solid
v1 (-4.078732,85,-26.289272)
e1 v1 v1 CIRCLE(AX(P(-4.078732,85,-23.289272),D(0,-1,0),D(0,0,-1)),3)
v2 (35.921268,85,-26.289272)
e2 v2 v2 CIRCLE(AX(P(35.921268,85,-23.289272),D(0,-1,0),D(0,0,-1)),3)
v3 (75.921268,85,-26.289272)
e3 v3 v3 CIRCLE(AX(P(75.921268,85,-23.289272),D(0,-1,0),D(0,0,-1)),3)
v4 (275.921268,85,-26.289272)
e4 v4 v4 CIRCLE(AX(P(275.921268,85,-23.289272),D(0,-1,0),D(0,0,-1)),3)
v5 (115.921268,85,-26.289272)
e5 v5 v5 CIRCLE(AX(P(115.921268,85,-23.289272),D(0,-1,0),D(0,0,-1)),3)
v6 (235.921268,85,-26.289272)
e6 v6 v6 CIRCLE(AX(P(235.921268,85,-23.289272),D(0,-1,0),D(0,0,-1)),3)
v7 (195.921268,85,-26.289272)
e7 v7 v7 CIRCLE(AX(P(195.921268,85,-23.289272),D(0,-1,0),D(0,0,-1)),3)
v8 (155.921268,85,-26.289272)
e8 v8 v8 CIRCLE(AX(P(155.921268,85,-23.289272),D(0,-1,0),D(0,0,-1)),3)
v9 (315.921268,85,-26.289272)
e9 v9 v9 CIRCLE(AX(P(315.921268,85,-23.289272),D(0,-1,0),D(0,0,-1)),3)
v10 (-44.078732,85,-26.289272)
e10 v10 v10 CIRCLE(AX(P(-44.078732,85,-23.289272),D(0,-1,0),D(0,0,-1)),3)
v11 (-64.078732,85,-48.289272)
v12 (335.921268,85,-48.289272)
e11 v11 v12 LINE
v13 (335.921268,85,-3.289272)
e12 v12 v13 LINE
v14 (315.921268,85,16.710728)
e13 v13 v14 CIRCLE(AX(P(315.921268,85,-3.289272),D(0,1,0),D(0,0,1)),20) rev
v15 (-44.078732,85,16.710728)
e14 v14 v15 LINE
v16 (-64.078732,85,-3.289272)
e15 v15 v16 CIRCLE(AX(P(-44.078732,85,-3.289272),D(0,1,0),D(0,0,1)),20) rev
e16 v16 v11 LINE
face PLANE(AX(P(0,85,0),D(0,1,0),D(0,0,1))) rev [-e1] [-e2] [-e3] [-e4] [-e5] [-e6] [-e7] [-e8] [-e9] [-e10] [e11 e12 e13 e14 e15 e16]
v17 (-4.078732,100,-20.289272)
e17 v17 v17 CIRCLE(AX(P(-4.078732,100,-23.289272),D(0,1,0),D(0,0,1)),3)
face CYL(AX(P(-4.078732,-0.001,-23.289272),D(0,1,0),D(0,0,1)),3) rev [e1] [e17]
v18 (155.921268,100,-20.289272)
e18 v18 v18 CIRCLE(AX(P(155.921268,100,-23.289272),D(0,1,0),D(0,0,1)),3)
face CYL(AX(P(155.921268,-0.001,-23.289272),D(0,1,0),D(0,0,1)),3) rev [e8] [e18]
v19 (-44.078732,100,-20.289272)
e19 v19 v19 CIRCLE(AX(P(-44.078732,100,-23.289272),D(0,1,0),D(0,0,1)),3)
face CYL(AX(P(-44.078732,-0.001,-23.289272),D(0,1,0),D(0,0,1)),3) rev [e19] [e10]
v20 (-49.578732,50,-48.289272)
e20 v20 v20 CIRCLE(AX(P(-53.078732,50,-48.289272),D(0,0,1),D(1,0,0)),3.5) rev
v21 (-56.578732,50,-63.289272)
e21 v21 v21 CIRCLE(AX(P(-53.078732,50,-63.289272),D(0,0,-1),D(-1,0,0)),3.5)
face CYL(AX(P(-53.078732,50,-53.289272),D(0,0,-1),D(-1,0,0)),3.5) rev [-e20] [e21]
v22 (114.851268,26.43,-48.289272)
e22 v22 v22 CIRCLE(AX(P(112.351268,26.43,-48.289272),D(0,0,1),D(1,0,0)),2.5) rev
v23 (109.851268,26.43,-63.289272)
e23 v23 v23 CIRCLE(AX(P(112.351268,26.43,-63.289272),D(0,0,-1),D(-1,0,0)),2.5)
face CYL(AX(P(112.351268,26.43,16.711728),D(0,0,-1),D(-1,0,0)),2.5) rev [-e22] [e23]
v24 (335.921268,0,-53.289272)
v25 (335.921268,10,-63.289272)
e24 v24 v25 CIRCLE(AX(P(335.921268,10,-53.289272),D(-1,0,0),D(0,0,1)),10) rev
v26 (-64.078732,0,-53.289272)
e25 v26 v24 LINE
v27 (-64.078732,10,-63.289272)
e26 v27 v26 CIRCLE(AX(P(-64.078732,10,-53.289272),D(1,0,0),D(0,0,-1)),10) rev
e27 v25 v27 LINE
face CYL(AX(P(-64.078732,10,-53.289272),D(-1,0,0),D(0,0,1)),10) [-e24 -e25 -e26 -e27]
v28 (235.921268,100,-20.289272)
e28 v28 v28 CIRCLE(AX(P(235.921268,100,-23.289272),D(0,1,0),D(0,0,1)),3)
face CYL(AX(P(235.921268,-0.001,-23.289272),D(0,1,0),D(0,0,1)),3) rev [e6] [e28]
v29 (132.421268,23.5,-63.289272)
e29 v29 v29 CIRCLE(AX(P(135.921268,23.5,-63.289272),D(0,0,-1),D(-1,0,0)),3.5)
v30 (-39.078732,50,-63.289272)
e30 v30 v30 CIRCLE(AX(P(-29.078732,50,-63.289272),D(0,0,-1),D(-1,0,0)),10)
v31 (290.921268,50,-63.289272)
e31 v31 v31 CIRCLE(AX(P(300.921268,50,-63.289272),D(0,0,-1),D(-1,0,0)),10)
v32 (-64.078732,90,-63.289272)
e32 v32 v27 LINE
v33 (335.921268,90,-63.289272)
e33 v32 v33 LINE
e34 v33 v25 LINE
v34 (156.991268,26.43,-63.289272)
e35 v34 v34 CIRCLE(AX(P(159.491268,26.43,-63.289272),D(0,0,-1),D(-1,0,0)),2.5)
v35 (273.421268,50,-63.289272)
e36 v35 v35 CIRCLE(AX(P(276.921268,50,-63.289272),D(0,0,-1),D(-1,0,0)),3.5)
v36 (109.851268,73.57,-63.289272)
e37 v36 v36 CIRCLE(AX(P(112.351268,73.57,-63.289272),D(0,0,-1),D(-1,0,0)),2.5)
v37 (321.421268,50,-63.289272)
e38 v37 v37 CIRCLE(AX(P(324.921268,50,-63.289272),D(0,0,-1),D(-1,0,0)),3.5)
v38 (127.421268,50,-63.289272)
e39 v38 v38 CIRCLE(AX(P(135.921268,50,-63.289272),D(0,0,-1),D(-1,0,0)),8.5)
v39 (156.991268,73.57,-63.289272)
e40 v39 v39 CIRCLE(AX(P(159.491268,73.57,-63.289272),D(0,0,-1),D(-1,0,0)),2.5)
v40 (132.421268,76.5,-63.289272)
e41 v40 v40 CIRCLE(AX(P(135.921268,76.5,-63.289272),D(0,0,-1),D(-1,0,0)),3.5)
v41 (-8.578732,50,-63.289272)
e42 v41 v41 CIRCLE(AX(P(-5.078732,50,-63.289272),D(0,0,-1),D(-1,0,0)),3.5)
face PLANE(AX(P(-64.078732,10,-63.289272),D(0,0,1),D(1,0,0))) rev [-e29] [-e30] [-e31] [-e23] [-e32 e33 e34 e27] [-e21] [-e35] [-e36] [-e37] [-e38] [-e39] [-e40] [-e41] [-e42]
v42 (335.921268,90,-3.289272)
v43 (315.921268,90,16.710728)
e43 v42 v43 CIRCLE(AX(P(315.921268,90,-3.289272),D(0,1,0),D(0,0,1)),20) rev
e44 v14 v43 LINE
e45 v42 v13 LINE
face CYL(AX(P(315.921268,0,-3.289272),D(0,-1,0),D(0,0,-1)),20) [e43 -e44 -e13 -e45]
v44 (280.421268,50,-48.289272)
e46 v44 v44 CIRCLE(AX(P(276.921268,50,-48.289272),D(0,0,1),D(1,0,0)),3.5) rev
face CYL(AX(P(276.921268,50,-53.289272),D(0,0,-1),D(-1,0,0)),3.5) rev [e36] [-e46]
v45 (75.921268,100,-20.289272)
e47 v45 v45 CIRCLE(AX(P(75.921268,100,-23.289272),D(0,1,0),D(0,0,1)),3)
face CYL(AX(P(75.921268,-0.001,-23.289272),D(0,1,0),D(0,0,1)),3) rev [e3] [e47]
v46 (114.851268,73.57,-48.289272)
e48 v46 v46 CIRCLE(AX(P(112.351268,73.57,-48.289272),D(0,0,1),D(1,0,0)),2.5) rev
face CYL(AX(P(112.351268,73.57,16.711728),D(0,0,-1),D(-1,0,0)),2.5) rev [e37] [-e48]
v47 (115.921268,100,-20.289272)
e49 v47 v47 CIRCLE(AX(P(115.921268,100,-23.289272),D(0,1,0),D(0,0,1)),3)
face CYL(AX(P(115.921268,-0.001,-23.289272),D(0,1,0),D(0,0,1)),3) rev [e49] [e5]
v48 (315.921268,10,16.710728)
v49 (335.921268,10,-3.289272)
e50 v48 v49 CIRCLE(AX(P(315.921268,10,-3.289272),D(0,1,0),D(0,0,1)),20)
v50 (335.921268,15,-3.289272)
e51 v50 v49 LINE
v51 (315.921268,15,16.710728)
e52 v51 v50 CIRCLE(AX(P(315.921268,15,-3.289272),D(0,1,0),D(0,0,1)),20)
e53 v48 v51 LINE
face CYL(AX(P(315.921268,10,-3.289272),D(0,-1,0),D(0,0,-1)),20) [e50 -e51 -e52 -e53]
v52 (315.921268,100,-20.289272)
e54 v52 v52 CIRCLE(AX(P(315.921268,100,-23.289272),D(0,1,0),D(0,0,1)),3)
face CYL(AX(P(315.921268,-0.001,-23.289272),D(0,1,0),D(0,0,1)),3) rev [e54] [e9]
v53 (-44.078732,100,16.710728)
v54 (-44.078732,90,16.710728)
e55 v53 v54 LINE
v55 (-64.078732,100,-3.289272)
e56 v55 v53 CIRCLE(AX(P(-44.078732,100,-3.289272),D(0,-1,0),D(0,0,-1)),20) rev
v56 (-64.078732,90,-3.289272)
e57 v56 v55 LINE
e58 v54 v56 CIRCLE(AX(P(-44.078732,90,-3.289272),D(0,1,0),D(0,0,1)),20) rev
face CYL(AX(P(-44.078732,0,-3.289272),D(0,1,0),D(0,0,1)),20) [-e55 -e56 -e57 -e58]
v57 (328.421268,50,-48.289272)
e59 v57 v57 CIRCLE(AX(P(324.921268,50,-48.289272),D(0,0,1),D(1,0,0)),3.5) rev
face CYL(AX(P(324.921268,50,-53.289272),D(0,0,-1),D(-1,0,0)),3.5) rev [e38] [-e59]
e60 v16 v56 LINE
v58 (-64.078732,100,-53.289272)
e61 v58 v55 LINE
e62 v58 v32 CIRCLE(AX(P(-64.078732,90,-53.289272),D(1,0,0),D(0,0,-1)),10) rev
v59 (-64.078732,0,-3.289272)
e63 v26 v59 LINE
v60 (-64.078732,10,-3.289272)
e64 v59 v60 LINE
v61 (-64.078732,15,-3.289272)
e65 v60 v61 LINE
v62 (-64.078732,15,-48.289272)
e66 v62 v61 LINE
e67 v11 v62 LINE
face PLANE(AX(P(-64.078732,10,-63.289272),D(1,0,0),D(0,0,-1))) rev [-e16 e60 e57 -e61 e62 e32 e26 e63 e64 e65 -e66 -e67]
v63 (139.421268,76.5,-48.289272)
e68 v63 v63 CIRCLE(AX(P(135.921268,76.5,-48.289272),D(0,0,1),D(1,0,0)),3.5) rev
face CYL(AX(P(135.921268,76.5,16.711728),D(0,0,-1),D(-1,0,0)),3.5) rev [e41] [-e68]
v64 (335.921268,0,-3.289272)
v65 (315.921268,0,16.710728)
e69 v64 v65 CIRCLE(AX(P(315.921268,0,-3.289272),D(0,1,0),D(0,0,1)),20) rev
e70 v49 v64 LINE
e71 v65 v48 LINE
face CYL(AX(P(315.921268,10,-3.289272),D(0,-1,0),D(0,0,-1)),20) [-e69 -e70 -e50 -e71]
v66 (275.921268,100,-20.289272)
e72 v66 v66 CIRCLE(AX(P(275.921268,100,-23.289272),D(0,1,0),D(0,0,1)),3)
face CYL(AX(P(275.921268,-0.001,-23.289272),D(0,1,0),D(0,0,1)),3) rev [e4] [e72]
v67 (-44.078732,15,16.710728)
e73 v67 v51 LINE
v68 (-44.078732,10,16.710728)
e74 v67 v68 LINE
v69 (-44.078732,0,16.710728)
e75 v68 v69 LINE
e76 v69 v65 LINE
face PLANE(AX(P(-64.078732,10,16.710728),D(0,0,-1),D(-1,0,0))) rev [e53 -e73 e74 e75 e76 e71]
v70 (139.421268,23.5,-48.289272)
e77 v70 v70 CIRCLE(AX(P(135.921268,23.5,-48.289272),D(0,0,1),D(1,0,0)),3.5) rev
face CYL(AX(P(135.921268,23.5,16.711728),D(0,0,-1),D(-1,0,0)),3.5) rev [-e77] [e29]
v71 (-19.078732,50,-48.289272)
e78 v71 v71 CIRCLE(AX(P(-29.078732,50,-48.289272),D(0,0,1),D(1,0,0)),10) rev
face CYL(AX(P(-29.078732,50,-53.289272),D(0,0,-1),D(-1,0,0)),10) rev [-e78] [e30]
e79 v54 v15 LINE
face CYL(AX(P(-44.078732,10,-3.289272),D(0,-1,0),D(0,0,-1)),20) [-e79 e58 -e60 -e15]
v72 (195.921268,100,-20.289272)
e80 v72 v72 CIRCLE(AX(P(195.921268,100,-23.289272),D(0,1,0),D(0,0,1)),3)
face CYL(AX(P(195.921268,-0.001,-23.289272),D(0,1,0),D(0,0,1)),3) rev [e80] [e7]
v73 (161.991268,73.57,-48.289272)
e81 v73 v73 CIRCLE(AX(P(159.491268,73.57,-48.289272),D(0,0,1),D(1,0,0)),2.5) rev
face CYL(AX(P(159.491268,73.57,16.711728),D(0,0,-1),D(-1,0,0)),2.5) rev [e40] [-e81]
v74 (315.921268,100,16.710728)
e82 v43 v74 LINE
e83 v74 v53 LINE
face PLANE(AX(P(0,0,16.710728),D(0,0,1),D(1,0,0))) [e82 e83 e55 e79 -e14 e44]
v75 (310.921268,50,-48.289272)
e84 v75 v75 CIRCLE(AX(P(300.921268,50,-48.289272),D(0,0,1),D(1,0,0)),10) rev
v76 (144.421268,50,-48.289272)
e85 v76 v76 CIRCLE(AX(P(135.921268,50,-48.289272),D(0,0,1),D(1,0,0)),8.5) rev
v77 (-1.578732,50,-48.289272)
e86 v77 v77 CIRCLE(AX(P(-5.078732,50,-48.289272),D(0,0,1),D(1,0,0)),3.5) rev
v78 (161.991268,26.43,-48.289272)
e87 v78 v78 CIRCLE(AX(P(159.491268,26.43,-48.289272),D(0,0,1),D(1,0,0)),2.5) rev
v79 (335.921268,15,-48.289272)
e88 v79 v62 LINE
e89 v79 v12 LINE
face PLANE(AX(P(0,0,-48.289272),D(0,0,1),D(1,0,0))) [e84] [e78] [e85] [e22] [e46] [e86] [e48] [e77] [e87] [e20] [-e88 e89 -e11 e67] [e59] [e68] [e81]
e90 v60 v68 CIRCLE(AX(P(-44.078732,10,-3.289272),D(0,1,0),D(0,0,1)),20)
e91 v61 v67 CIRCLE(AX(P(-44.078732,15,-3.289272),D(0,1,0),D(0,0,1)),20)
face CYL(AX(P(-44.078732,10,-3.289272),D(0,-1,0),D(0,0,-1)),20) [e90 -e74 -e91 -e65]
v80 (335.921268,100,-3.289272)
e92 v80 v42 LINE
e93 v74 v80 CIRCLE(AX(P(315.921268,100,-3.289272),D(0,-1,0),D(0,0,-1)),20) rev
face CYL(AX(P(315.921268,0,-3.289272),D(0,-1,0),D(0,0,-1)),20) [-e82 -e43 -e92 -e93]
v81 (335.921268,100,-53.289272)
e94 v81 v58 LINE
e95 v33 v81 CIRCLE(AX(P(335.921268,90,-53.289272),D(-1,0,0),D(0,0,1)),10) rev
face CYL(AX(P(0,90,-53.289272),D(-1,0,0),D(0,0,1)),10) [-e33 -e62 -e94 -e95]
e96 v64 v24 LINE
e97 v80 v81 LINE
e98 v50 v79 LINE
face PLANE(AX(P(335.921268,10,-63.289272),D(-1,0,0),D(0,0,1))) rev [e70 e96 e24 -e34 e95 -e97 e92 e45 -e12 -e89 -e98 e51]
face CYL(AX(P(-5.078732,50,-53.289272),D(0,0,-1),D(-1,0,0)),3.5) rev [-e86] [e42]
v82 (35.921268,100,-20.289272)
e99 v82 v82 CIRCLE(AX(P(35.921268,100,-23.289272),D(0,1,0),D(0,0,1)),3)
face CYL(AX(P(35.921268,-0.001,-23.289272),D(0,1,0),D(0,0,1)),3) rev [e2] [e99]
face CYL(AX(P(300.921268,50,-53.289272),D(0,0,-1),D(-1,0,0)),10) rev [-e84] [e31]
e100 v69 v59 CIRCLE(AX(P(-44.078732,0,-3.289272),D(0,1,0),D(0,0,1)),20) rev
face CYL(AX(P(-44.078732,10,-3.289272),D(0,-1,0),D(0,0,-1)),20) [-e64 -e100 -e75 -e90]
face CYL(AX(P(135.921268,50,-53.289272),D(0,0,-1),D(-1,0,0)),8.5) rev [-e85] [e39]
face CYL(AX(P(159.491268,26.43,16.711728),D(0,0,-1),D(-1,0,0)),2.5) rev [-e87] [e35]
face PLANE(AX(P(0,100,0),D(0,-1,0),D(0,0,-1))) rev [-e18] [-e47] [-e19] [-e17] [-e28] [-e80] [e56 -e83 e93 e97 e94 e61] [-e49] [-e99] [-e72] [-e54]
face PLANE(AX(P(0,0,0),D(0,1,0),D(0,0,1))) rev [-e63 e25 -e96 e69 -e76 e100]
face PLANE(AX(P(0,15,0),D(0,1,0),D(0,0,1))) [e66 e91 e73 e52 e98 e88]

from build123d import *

# Parameters (mm, degrees)
SKETCH1_W           = 400
SKETCH1_H           = 80
BOSS_EXTRUDE1_DEPTH = 10
SKETCH2_W           = 400
SKETCH2_H           = 10
BOSS_EXTRUDE2_DEPTH = 80
SKETCH3_W           = 400
SKETCH3_H           = 10
BOSS_EXTRUDE3_DEPTH = 10
SKETCH4_W           = 400
SKETCH4_H           = 10
BOSS_EXTRUDE4_DEPTH = 70
FILLET1_R           = 20
FILLET2_R           = 10
CUT_EXTRUDE2_REACH  = 361.504
SKETCH6_R           = 2.5
SKETCH8_R           = 3.5
SKETCH8_R_2         = 10
SKETCH8_R_3         = 8.5
CUT_EXTRUDE3_DEPTH  = 10
CUT_EXTRUDE4_REACH  = 361.504
SKETCH9_R           = 3.5
SKETCH10_R          = 3.5
BOSS_EXTRUDE5_DEPTH = 10
CUT_EXTRUDE5_REACH  = 358.158
SKETCH11_R          = 3
SKETCH13_W          = 400
SKETCH13_H          = 80
SKETCH13_R          = 3.5
SKETCH13_R_2        = 10
SKETCH13_R_3        = 8.5
SKETCH13_R_4        = 2.5
BOSS_EXTRUDE7_DEPTH = 5
SKETCH16_W          = 400
SKETCH16_H          = 65
BOSS_EXTRUDE8_DEPTH = 5
FILLET3_R           = 20
SKETCH17_W          = 400
SKETCH17_H          = 65
SKETCH17_R          = 3
BOSS_EXTRUDE9_DEPTH = 5
FILLET4_R           = 20


with BuildPart() as part:
    # Sketch1 → Boss-Extrude1 (new body)
    with BuildSketch(Plane(origin=(0, 0, 0), x_dir=(1, 0, 0), z_dir=(0, 1, 0))):
        with Locations((135.921268108, 23.289271879)):
            Rectangle(SKETCH1_W, SKETCH1_H)
    extrude(amount=BOSS_EXTRUDE1_DEPTH)

    # Sketch2 → Boss-Extrude2 (add)
    with BuildSketch(Plane(origin=(0, 10, 0), x_dir=(1, 0, 0), z_dir=(0, 1, 0))):
        with Locations((135.921268108, 58.289271879)):
            Rectangle(SKETCH2_W, SKETCH2_H)
    extrude(amount=BOSS_EXTRUDE2_DEPTH)

    # Sketch3 → Boss-Extrude3 (add)
    with BuildSketch(Plane(origin=(0, 90, 0), x_dir=(1, 0, 0), z_dir=(0, 1, 0))):
        with Locations((135.921268108, 58.289271879)):
            Rectangle(SKETCH3_W, SKETCH3_H)
    extrude(amount=BOSS_EXTRUDE3_DEPTH)

    # Sketch4 → Boss-Extrude4 (add)
    with BuildSketch(Plane.XY.offset(-53.289271879)):
        with Locations((135.921268108, 95)):
            Rectangle(SKETCH4_W, SKETCH4_H)
    extrude(amount=BOSS_EXTRUDE4_DEPTH)

    # Fillet1
    fillet1_edges = [part.edges().sort_by_distance(p)[0] for p in [
        (-64.078731892, 95, 16.710728121),
        (335.921268108, 95, 16.710728121),
        (-64.078731892, 5, 16.710728121),
        (335.921268108, 5, 16.710728121),
    ]]
    fillet(fillet1_edges, radius=FILLET1_R)

    # Fillet2
    fillet2_edges = [part.edges().sort_by_distance(p)[0] for p in [
        (135.921268108, 100, -63.289271879),
        (135.921268108, 0, -63.289271879),
    ]]
    fillet(fillet2_edges, radius=FILLET2_R)

    # Sketch6 → Cut-Extrude2 (cut, up to next)
    with BuildSketch(Plane(origin=(0, 0, -63.289271879), x_dir=(-1, 0, 0), z_dir=(0, 0, -1)), mode=Mode.PRIVATE) as cut_extrude2_sk1:
        with Locations((-112.351268108, 73.57)):
            Circle(SKETCH6_R)
    cut_extrude2_tool1 = extrude(cut_extrude2_sk1.sketch, amount=-CUT_EXTRUDE2_REACH, mode=Mode.PRIVATE) & part.part
    # Sketch6 → Cut-Extrude2 (cut, up to next)
    with BuildSketch(Plane(origin=(0, 0, -63.289271879), x_dir=(-1, 0, 0), z_dir=(0, 0, -1)), mode=Mode.PRIVATE) as cut_extrude2_sk2:
        with Locations((-112.351268108, 26.43)):
            Circle(SKETCH6_R)
    cut_extrude2_tool2 = extrude(cut_extrude2_sk2.sketch, amount=-CUT_EXTRUDE2_REACH, mode=Mode.PRIVATE) & part.part
    # Sketch6 → Cut-Extrude2 (cut, up to next)
    with BuildSketch(Plane(origin=(0, 0, -63.289271879), x_dir=(-1, 0, 0), z_dir=(0, 0, -1)), mode=Mode.PRIVATE) as cut_extrude2_sk3:
        with Locations((-159.491268108, 26.43)):
            Circle(SKETCH6_R)
    cut_extrude2_tool3 = extrude(cut_extrude2_sk3.sketch, amount=-CUT_EXTRUDE2_REACH, mode=Mode.PRIVATE) & part.part
    # Sketch6 → Cut-Extrude2 (cut, up to next)
    with BuildSketch(Plane(origin=(0, 0, -63.289271879), x_dir=(-1, 0, 0), z_dir=(0, 0, -1)), mode=Mode.PRIVATE) as cut_extrude2_sk4:
        with Locations((-159.491268108, 73.57)):
            Circle(SKETCH6_R)
    cut_extrude2_tool4 = extrude(cut_extrude2_sk4.sketch, amount=-CUT_EXTRUDE2_REACH, mode=Mode.PRIVATE) & part.part
    add(cut_extrude2_tool1.solids().sort_by_distance((112.351268, 73.57, -63.289272))[0], mode=Mode.SUBTRACT)
    add(cut_extrude2_tool2.solids().sort_by_distance((112.351268, 26.43, -63.289272))[0], mode=Mode.SUBTRACT)
    add(cut_extrude2_tool3.solids().sort_by_distance((159.491268, 26.43, -63.289272))[0], mode=Mode.SUBTRACT)
    add(cut_extrude2_tool4.solids().sort_by_distance((159.491268, 73.57, -63.289272))[0], mode=Mode.SUBTRACT)

    # Sketch8 → Cut-Extrude3 (cut)
    with BuildSketch(Plane(origin=(0, 0, -63.289271879), x_dir=(-1, 0, 0), z_dir=(0, 0, -1))):
        with Locations((53.078731892, 50)):
            Circle(SKETCH8_R)
        with Locations((5.078731892, 50)):
            Circle(SKETCH8_R)
        with Locations((29.078731892, 50)):
            Circle(SKETCH8_R_2)
        with Locations((-276.921268108, 50)):
            Circle(SKETCH8_R)
        with Locations((-300.921268108, 50)):
            Circle(SKETCH8_R_2)
        with Locations((-135.921268108, 50)):
            Circle(SKETCH8_R_3)
        with Locations((-109.421268108, 50)):
            Circle(SKETCH8_R)
        with Locations((-162.421268108, 50)):
            Circle(SKETCH8_R)
        with Locations((-324.921268108, 50)):
            Circle(SKETCH8_R)
    extrude(amount=-CUT_EXTRUDE3_DEPTH, mode=Mode.SUBTRACT)

    # Sketch9 → Cut-Extrude4 (cut, up to next)
    with BuildSketch(Plane(origin=(0, 0, -63.289271879), x_dir=(-1, 0, 0), z_dir=(0, 0, -1)), mode=Mode.PRIVATE) as cut_extrude4_sk1:
        with Locations((-135.921268108, 76.5)):
            Circle(SKETCH9_R)
    cut_extrude4_tool1 = extrude(cut_extrude4_sk1.sketch, amount=-CUT_EXTRUDE4_REACH, mode=Mode.PRIVATE) & part.part
    # Sketch9 → Cut-Extrude4 (cut, up to next)
    with BuildSketch(Plane(origin=(0, 0, -63.289271879), x_dir=(-1, 0, 0), z_dir=(0, 0, -1)), mode=Mode.PRIVATE) as cut_extrude4_sk2:
        with Locations((-135.921268108, 23.5)):
            Circle(SKETCH9_R)
    cut_extrude4_tool2 = extrude(cut_extrude4_sk2.sketch, amount=-CUT_EXTRUDE4_REACH, mode=Mode.PRIVATE) & part.part
    add(cut_extrude4_tool1.solids().sort_by_distance((135.921268, 76.5, -63.289272))[0], mode=Mode.SUBTRACT)
    add(cut_extrude4_tool2.solids().sort_by_distance((135.921268, 23.5, -63.289272))[0], mode=Mode.SUBTRACT)

    # Sketch10 → Boss-Extrude5 (add)
    with BuildSketch(Plane(origin=(0, 0, -63.289271879), x_dir=(-1, 0, 0), z_dir=(0, 0, -1))):
        with Locations((-109.421268108, 50)):
            Circle(SKETCH10_R)
        with Locations((-162.421268108, 50)):
            Circle(SKETCH10_R)
    extrude(amount=-BOSS_EXTRUDE5_DEPTH)

    # Sketch11 → Cut-Extrude5 (cut, up to next)
    with BuildSketch(Plane(origin=(0, 100, 0), x_dir=(1, 0, 0), z_dir=(0, 1, 0)), mode=Mode.PRIVATE) as cut_extrude5_sk1:
        with Locations(Location((-44.078731892, 23.289271879, 0), (0, 0, 270))):
            Circle(SKETCH11_R)
    cut_extrude5_tool1 = extrude(cut_extrude5_sk1.sketch, amount=-CUT_EXTRUDE5_REACH, mode=Mode.PRIVATE) & part.part
    # Sketch11 → Cut-Extrude5 (cut, up to next)
    with BuildSketch(Plane(origin=(0, 100, 0), x_dir=(1, 0, 0), z_dir=(0, 1, 0)), mode=Mode.PRIVATE) as cut_extrude5_sk2:
        with Locations(Location((-4.078731892, 23.289271879, 0), (0, 0, 270))):
            Circle(SKETCH11_R)
    cut_extrude5_tool2 = extrude(cut_extrude5_sk2.sketch, amount=-CUT_EXTRUDE5_REACH, mode=Mode.PRIVATE) & part.part
    # Sketch11 → Cut-Extrude5 (cut, up to next)
    with BuildSketch(Plane(origin=(0, 100, 0), x_dir=(1, 0, 0), z_dir=(0, 1, 0)), mode=Mode.PRIVATE) as cut_extrude5_sk3:
        with Locations(Location((35.921268108, 23.289271879, 0), (0, 0, 270))):
            Circle(SKETCH11_R)
    cut_extrude5_tool3 = extrude(cut_extrude5_sk3.sketch, amount=-CUT_EXTRUDE5_REACH, mode=Mode.PRIVATE) & part.part
    # Sketch11 → Cut-Extrude5 (cut, up to next)
    with BuildSketch(Plane(origin=(0, 100, 0), x_dir=(1, 0, 0), z_dir=(0, 1, 0)), mode=Mode.PRIVATE) as cut_extrude5_sk4:
        with Locations(Location((75.921268108, 23.289271879, 0), (0, 0, 270))):
            Circle(SKETCH11_R)
    cut_extrude5_tool4 = extrude(cut_extrude5_sk4.sketch, amount=-CUT_EXTRUDE5_REACH, mode=Mode.PRIVATE) & part.part
    # Sketch11 → Cut-Extrude5 (cut, up to next)
    with BuildSketch(Plane(origin=(0, 100, 0), x_dir=(1, 0, 0), z_dir=(0, 1, 0)), mode=Mode.PRIVATE) as cut_extrude5_sk5:
        with Locations(Location((115.921268108, 23.289271879, 0), (0, 0, 270))):
            Circle(SKETCH11_R)
    cut_extrude5_tool5 = extrude(cut_extrude5_sk5.sketch, amount=-CUT_EXTRUDE5_REACH, mode=Mode.PRIVATE) & part.part
    # Sketch11 → Cut-Extrude5 (cut, up to next)
    with BuildSketch(Plane(origin=(0, 100, 0), x_dir=(1, 0, 0), z_dir=(0, 1, 0)), mode=Mode.PRIVATE) as cut_extrude5_sk6:
        with Locations(Location((155.921268108, 23.289271879, 0), (0, 0, 270))):
            Circle(SKETCH11_R)
    cut_extrude5_tool6 = extrude(cut_extrude5_sk6.sketch, amount=-CUT_EXTRUDE5_REACH, mode=Mode.PRIVATE) & part.part
    # Sketch11 → Cut-Extrude5 (cut, up to next)
    with BuildSketch(Plane(origin=(0, 100, 0), x_dir=(1, 0, 0), z_dir=(0, 1, 0)), mode=Mode.PRIVATE) as cut_extrude5_sk7:
        with Locations(Location((195.921268108, 23.289271879, 0), (0, 0, 270))):
            Circle(SKETCH11_R)
    cut_extrude5_tool7 = extrude(cut_extrude5_sk7.sketch, amount=-CUT_EXTRUDE5_REACH, mode=Mode.PRIVATE) & part.part
    # Sketch11 → Cut-Extrude5 (cut, up to next)
    with BuildSketch(Plane(origin=(0, 100, 0), x_dir=(1, 0, 0), z_dir=(0, 1, 0)), mode=Mode.PRIVATE) as cut_extrude5_sk8:
        with Locations(Location((235.921268108, 23.289271879, 0), (0, 0, 270))):
            Circle(SKETCH11_R)
    cut_extrude5_tool8 = extrude(cut_extrude5_sk8.sketch, amount=-CUT_EXTRUDE5_REACH, mode=Mode.PRIVATE) & part.part
    # Sketch11 → Cut-Extrude5 (cut, up to next)
    with BuildSketch(Plane(origin=(0, 100, 0), x_dir=(1, 0, 0), z_dir=(0, 1, 0)), mode=Mode.PRIVATE) as cut_extrude5_sk9:
        with Locations(Location((275.921268108, 23.289271879, 0), (0, 0, 270))):
            Circle(SKETCH11_R)
    cut_extrude5_tool9 = extrude(cut_extrude5_sk9.sketch, amount=-CUT_EXTRUDE5_REACH, mode=Mode.PRIVATE) & part.part
    # Sketch11 → Cut-Extrude5 (cut, up to next)
    with BuildSketch(Plane(origin=(0, 100, 0), x_dir=(1, 0, 0), z_dir=(0, 1, 0)), mode=Mode.PRIVATE) as cut_extrude5_sk10:
        with Locations(Location((315.921268108, 23.289271879, 0), (0, 0, 270))):
            Circle(SKETCH11_R)
    cut_extrude5_tool10 = extrude(cut_extrude5_sk10.sketch, amount=-CUT_EXTRUDE5_REACH, mode=Mode.PRIVATE) & part.part
    add(cut_extrude5_tool1.solids().sort_by_distance((-44.078732, 100, -23.289272))[0], mode=Mode.SUBTRACT)
    add(cut_extrude5_tool2.solids().sort_by_distance((-4.078732, 100, -23.289272))[0], mode=Mode.SUBTRACT)
    add(cut_extrude5_tool3.solids().sort_by_distance((35.921268, 100, -23.289272))[0], mode=Mode.SUBTRACT)
    add(cut_extrude5_tool4.solids().sort_by_distance((75.921268, 100, -23.289272))[0], mode=Mode.SUBTRACT)
    add(cut_extrude5_tool5.solids().sort_by_distance((115.921268, 100, -23.289272))[0], mode=Mode.SUBTRACT)
    add(cut_extrude5_tool6.solids().sort_by_distance((155.921268, 100, -23.289272))[0], mode=Mode.SUBTRACT)
    add(cut_extrude5_tool7.solids().sort_by_distance((195.921268, 100, -23.289272))[0], mode=Mode.SUBTRACT)
    add(cut_extrude5_tool8.solids().sort_by_distance((235.921268, 100, -23.289272))[0], mode=Mode.SUBTRACT)
    add(cut_extrude5_tool9.solids().sort_by_distance((275.921268, 100, -23.289272))[0], mode=Mode.SUBTRACT)
    add(cut_extrude5_tool10.solids().sort_by_distance((315.921268, 100, -23.289272))[0], mode=Mode.SUBTRACT)

    # Sketch13 → Boss-Extrude7 (add)
    with BuildSketch(Plane.XY.offset(-53.289271879)):
        with Locations((135.921268108, 50)):
            Rectangle(SKETCH13_W, SKETCH13_H)
        with Locations(Location((135.921268108, 76.5, 0), (0, 0, 180))):
            Circle(SKETCH13_R, mode=Mode.SUBTRACT)
        with Locations(Location((-29.078731892, 50, 0), (0, 0, 180))):
            Circle(SKETCH13_R_2, mode=Mode.SUBTRACT)
        with Locations(Location((135.921268108, 50, 0), (0, 0, 180))):
            Circle(SKETCH13_R_3, mode=Mode.SUBTRACT)
        with Locations(Location((300.921268108, 50, 0), (0, 0, 180))):
            Circle(SKETCH13_R_2, mode=Mode.SUBTRACT)
        with Locations(Location((112.351268108, 26.43, 0), (0, 0, 180))):
            Circle(SKETCH13_R_4, mode=Mode.SUBTRACT)
        with Locations(Location((159.491268108, 73.57, 0), (0, 0, 180))):
            Circle(SKETCH13_R_4, mode=Mode.SUBTRACT)
        with Locations(Location((112.351268108, 73.57, 0), (0, 0, 180))):
            Circle(SKETCH13_R_4, mode=Mode.SUBTRACT)
        with Locations(Location((159.491268108, 26.43, 0), (0, 0, 180))):
            Circle(SKETCH13_R_4, mode=Mode.SUBTRACT)
        with Locations(Location((324.921268108, 50, 0), (0, 0, 180))):
            Circle(SKETCH13_R, mode=Mode.SUBTRACT)
        with Locations(Location((276.921268108, 50, 0), (0, 0, 180))):
            Circle(SKETCH13_R, mode=Mode.SUBTRACT)
        with Locations(Location((-5.078731892, 50, 0), (0, 0, 180))):
            Circle(SKETCH13_R, mode=Mode.SUBTRACT)
        with Locations(Location((-53.078731892, 50, 0), (0, 0, 180))):
            Circle(SKETCH13_R, mode=Mode.SUBTRACT)
        with Locations(Location((135.921268108, 23.5, 0), (0, 0, 180))):
            Circle(SKETCH13_R, mode=Mode.SUBTRACT)
    extrude(amount=BOSS_EXTRUDE7_DEPTH)

    # Sketch16 → Boss-Extrude8 (add)
    with BuildSketch(Plane(origin=(0, 10, 0), x_dir=(1, 0, 0), z_dir=(0, 1, 0))):
        with Locations((135.921268108, 15.789271879)):
            Rectangle(SKETCH16_W, SKETCH16_H)
    extrude(amount=BOSS_EXTRUDE8_DEPTH)

    # Fillet3
    fillet3_edges = [part.edges().sort_by_distance(p)[0] for p in [
        (-64.078731892, 12.5, 16.710728121),
        (335.921268108, 12.5, 16.710728121),
    ]]
    fillet(fillet3_edges, radius=FILLET3_R)

    # Sketch17 → Boss-Extrude9 (add)
    with BuildSketch(Plane.XZ.offset(-90)):
        with Locations((135.921268108, -15.789271879)):
            Rectangle(SKETCH17_W, SKETCH17_H)
        with Locations(Location((-44.078731892, -23.289271879, 0), (0, 0, 90))):
            Circle(SKETCH17_R, mode=Mode.SUBTRACT)
        with Locations(Location((-4.078731892, -23.289271879, 0), (0, 0, 90))):
            Circle(SKETCH17_R, mode=Mode.SUBTRACT)
        with Locations(Location((35.921268108, -23.289271879, 0), (0, 0, 90))):
            Circle(SKETCH17_R, mode=Mode.SUBTRACT)
        with Locations(Location((75.921268108, -23.289271879, 0), (0, 0, 90))):
            Circle(SKETCH17_R, mode=Mode.SUBTRACT)
        with Locations(Location((115.921268108, -23.289271879, 0), (0, 0, 90))):
            Circle(SKETCH17_R, mode=Mode.SUBTRACT)
        with Locations(Location((155.921268108, -23.289271879, 0), (0, 0, 90))):
            Circle(SKETCH17_R, mode=Mode.SUBTRACT)
        with Locations(Location((195.921268108, -23.289271879, 0), (0, 0, 90))):
            Circle(SKETCH17_R, mode=Mode.SUBTRACT)
        with Locations(Location((235.921268108, -23.289271879, 0), (0, 0, 90))):
            Circle(SKETCH17_R, mode=Mode.SUBTRACT)
        with Locations(Location((275.921268108, -23.289271879, 0), (0, 0, 90))):
            Circle(SKETCH17_R, mode=Mode.SUBTRACT)
        with Locations(Location((315.921268108, -23.289271879, 0), (0, 0, 90))):
            Circle(SKETCH17_R, mode=Mode.SUBTRACT)
    extrude(amount=BOSS_EXTRUDE9_DEPTH)

    # Fillet4
    fillet4_edges = [part.edges().sort_by_distance(p)[0] for p in [
        (335.921268108, 87.5, 16.710728121),
        (-64.078731892, 87.5, 16.710728121),
    ]]
    fillet(fillet4_edges, radius=FILLET4_R - 0.0001)  # a hair under: the kernel refuses the full size


solid = part.part
